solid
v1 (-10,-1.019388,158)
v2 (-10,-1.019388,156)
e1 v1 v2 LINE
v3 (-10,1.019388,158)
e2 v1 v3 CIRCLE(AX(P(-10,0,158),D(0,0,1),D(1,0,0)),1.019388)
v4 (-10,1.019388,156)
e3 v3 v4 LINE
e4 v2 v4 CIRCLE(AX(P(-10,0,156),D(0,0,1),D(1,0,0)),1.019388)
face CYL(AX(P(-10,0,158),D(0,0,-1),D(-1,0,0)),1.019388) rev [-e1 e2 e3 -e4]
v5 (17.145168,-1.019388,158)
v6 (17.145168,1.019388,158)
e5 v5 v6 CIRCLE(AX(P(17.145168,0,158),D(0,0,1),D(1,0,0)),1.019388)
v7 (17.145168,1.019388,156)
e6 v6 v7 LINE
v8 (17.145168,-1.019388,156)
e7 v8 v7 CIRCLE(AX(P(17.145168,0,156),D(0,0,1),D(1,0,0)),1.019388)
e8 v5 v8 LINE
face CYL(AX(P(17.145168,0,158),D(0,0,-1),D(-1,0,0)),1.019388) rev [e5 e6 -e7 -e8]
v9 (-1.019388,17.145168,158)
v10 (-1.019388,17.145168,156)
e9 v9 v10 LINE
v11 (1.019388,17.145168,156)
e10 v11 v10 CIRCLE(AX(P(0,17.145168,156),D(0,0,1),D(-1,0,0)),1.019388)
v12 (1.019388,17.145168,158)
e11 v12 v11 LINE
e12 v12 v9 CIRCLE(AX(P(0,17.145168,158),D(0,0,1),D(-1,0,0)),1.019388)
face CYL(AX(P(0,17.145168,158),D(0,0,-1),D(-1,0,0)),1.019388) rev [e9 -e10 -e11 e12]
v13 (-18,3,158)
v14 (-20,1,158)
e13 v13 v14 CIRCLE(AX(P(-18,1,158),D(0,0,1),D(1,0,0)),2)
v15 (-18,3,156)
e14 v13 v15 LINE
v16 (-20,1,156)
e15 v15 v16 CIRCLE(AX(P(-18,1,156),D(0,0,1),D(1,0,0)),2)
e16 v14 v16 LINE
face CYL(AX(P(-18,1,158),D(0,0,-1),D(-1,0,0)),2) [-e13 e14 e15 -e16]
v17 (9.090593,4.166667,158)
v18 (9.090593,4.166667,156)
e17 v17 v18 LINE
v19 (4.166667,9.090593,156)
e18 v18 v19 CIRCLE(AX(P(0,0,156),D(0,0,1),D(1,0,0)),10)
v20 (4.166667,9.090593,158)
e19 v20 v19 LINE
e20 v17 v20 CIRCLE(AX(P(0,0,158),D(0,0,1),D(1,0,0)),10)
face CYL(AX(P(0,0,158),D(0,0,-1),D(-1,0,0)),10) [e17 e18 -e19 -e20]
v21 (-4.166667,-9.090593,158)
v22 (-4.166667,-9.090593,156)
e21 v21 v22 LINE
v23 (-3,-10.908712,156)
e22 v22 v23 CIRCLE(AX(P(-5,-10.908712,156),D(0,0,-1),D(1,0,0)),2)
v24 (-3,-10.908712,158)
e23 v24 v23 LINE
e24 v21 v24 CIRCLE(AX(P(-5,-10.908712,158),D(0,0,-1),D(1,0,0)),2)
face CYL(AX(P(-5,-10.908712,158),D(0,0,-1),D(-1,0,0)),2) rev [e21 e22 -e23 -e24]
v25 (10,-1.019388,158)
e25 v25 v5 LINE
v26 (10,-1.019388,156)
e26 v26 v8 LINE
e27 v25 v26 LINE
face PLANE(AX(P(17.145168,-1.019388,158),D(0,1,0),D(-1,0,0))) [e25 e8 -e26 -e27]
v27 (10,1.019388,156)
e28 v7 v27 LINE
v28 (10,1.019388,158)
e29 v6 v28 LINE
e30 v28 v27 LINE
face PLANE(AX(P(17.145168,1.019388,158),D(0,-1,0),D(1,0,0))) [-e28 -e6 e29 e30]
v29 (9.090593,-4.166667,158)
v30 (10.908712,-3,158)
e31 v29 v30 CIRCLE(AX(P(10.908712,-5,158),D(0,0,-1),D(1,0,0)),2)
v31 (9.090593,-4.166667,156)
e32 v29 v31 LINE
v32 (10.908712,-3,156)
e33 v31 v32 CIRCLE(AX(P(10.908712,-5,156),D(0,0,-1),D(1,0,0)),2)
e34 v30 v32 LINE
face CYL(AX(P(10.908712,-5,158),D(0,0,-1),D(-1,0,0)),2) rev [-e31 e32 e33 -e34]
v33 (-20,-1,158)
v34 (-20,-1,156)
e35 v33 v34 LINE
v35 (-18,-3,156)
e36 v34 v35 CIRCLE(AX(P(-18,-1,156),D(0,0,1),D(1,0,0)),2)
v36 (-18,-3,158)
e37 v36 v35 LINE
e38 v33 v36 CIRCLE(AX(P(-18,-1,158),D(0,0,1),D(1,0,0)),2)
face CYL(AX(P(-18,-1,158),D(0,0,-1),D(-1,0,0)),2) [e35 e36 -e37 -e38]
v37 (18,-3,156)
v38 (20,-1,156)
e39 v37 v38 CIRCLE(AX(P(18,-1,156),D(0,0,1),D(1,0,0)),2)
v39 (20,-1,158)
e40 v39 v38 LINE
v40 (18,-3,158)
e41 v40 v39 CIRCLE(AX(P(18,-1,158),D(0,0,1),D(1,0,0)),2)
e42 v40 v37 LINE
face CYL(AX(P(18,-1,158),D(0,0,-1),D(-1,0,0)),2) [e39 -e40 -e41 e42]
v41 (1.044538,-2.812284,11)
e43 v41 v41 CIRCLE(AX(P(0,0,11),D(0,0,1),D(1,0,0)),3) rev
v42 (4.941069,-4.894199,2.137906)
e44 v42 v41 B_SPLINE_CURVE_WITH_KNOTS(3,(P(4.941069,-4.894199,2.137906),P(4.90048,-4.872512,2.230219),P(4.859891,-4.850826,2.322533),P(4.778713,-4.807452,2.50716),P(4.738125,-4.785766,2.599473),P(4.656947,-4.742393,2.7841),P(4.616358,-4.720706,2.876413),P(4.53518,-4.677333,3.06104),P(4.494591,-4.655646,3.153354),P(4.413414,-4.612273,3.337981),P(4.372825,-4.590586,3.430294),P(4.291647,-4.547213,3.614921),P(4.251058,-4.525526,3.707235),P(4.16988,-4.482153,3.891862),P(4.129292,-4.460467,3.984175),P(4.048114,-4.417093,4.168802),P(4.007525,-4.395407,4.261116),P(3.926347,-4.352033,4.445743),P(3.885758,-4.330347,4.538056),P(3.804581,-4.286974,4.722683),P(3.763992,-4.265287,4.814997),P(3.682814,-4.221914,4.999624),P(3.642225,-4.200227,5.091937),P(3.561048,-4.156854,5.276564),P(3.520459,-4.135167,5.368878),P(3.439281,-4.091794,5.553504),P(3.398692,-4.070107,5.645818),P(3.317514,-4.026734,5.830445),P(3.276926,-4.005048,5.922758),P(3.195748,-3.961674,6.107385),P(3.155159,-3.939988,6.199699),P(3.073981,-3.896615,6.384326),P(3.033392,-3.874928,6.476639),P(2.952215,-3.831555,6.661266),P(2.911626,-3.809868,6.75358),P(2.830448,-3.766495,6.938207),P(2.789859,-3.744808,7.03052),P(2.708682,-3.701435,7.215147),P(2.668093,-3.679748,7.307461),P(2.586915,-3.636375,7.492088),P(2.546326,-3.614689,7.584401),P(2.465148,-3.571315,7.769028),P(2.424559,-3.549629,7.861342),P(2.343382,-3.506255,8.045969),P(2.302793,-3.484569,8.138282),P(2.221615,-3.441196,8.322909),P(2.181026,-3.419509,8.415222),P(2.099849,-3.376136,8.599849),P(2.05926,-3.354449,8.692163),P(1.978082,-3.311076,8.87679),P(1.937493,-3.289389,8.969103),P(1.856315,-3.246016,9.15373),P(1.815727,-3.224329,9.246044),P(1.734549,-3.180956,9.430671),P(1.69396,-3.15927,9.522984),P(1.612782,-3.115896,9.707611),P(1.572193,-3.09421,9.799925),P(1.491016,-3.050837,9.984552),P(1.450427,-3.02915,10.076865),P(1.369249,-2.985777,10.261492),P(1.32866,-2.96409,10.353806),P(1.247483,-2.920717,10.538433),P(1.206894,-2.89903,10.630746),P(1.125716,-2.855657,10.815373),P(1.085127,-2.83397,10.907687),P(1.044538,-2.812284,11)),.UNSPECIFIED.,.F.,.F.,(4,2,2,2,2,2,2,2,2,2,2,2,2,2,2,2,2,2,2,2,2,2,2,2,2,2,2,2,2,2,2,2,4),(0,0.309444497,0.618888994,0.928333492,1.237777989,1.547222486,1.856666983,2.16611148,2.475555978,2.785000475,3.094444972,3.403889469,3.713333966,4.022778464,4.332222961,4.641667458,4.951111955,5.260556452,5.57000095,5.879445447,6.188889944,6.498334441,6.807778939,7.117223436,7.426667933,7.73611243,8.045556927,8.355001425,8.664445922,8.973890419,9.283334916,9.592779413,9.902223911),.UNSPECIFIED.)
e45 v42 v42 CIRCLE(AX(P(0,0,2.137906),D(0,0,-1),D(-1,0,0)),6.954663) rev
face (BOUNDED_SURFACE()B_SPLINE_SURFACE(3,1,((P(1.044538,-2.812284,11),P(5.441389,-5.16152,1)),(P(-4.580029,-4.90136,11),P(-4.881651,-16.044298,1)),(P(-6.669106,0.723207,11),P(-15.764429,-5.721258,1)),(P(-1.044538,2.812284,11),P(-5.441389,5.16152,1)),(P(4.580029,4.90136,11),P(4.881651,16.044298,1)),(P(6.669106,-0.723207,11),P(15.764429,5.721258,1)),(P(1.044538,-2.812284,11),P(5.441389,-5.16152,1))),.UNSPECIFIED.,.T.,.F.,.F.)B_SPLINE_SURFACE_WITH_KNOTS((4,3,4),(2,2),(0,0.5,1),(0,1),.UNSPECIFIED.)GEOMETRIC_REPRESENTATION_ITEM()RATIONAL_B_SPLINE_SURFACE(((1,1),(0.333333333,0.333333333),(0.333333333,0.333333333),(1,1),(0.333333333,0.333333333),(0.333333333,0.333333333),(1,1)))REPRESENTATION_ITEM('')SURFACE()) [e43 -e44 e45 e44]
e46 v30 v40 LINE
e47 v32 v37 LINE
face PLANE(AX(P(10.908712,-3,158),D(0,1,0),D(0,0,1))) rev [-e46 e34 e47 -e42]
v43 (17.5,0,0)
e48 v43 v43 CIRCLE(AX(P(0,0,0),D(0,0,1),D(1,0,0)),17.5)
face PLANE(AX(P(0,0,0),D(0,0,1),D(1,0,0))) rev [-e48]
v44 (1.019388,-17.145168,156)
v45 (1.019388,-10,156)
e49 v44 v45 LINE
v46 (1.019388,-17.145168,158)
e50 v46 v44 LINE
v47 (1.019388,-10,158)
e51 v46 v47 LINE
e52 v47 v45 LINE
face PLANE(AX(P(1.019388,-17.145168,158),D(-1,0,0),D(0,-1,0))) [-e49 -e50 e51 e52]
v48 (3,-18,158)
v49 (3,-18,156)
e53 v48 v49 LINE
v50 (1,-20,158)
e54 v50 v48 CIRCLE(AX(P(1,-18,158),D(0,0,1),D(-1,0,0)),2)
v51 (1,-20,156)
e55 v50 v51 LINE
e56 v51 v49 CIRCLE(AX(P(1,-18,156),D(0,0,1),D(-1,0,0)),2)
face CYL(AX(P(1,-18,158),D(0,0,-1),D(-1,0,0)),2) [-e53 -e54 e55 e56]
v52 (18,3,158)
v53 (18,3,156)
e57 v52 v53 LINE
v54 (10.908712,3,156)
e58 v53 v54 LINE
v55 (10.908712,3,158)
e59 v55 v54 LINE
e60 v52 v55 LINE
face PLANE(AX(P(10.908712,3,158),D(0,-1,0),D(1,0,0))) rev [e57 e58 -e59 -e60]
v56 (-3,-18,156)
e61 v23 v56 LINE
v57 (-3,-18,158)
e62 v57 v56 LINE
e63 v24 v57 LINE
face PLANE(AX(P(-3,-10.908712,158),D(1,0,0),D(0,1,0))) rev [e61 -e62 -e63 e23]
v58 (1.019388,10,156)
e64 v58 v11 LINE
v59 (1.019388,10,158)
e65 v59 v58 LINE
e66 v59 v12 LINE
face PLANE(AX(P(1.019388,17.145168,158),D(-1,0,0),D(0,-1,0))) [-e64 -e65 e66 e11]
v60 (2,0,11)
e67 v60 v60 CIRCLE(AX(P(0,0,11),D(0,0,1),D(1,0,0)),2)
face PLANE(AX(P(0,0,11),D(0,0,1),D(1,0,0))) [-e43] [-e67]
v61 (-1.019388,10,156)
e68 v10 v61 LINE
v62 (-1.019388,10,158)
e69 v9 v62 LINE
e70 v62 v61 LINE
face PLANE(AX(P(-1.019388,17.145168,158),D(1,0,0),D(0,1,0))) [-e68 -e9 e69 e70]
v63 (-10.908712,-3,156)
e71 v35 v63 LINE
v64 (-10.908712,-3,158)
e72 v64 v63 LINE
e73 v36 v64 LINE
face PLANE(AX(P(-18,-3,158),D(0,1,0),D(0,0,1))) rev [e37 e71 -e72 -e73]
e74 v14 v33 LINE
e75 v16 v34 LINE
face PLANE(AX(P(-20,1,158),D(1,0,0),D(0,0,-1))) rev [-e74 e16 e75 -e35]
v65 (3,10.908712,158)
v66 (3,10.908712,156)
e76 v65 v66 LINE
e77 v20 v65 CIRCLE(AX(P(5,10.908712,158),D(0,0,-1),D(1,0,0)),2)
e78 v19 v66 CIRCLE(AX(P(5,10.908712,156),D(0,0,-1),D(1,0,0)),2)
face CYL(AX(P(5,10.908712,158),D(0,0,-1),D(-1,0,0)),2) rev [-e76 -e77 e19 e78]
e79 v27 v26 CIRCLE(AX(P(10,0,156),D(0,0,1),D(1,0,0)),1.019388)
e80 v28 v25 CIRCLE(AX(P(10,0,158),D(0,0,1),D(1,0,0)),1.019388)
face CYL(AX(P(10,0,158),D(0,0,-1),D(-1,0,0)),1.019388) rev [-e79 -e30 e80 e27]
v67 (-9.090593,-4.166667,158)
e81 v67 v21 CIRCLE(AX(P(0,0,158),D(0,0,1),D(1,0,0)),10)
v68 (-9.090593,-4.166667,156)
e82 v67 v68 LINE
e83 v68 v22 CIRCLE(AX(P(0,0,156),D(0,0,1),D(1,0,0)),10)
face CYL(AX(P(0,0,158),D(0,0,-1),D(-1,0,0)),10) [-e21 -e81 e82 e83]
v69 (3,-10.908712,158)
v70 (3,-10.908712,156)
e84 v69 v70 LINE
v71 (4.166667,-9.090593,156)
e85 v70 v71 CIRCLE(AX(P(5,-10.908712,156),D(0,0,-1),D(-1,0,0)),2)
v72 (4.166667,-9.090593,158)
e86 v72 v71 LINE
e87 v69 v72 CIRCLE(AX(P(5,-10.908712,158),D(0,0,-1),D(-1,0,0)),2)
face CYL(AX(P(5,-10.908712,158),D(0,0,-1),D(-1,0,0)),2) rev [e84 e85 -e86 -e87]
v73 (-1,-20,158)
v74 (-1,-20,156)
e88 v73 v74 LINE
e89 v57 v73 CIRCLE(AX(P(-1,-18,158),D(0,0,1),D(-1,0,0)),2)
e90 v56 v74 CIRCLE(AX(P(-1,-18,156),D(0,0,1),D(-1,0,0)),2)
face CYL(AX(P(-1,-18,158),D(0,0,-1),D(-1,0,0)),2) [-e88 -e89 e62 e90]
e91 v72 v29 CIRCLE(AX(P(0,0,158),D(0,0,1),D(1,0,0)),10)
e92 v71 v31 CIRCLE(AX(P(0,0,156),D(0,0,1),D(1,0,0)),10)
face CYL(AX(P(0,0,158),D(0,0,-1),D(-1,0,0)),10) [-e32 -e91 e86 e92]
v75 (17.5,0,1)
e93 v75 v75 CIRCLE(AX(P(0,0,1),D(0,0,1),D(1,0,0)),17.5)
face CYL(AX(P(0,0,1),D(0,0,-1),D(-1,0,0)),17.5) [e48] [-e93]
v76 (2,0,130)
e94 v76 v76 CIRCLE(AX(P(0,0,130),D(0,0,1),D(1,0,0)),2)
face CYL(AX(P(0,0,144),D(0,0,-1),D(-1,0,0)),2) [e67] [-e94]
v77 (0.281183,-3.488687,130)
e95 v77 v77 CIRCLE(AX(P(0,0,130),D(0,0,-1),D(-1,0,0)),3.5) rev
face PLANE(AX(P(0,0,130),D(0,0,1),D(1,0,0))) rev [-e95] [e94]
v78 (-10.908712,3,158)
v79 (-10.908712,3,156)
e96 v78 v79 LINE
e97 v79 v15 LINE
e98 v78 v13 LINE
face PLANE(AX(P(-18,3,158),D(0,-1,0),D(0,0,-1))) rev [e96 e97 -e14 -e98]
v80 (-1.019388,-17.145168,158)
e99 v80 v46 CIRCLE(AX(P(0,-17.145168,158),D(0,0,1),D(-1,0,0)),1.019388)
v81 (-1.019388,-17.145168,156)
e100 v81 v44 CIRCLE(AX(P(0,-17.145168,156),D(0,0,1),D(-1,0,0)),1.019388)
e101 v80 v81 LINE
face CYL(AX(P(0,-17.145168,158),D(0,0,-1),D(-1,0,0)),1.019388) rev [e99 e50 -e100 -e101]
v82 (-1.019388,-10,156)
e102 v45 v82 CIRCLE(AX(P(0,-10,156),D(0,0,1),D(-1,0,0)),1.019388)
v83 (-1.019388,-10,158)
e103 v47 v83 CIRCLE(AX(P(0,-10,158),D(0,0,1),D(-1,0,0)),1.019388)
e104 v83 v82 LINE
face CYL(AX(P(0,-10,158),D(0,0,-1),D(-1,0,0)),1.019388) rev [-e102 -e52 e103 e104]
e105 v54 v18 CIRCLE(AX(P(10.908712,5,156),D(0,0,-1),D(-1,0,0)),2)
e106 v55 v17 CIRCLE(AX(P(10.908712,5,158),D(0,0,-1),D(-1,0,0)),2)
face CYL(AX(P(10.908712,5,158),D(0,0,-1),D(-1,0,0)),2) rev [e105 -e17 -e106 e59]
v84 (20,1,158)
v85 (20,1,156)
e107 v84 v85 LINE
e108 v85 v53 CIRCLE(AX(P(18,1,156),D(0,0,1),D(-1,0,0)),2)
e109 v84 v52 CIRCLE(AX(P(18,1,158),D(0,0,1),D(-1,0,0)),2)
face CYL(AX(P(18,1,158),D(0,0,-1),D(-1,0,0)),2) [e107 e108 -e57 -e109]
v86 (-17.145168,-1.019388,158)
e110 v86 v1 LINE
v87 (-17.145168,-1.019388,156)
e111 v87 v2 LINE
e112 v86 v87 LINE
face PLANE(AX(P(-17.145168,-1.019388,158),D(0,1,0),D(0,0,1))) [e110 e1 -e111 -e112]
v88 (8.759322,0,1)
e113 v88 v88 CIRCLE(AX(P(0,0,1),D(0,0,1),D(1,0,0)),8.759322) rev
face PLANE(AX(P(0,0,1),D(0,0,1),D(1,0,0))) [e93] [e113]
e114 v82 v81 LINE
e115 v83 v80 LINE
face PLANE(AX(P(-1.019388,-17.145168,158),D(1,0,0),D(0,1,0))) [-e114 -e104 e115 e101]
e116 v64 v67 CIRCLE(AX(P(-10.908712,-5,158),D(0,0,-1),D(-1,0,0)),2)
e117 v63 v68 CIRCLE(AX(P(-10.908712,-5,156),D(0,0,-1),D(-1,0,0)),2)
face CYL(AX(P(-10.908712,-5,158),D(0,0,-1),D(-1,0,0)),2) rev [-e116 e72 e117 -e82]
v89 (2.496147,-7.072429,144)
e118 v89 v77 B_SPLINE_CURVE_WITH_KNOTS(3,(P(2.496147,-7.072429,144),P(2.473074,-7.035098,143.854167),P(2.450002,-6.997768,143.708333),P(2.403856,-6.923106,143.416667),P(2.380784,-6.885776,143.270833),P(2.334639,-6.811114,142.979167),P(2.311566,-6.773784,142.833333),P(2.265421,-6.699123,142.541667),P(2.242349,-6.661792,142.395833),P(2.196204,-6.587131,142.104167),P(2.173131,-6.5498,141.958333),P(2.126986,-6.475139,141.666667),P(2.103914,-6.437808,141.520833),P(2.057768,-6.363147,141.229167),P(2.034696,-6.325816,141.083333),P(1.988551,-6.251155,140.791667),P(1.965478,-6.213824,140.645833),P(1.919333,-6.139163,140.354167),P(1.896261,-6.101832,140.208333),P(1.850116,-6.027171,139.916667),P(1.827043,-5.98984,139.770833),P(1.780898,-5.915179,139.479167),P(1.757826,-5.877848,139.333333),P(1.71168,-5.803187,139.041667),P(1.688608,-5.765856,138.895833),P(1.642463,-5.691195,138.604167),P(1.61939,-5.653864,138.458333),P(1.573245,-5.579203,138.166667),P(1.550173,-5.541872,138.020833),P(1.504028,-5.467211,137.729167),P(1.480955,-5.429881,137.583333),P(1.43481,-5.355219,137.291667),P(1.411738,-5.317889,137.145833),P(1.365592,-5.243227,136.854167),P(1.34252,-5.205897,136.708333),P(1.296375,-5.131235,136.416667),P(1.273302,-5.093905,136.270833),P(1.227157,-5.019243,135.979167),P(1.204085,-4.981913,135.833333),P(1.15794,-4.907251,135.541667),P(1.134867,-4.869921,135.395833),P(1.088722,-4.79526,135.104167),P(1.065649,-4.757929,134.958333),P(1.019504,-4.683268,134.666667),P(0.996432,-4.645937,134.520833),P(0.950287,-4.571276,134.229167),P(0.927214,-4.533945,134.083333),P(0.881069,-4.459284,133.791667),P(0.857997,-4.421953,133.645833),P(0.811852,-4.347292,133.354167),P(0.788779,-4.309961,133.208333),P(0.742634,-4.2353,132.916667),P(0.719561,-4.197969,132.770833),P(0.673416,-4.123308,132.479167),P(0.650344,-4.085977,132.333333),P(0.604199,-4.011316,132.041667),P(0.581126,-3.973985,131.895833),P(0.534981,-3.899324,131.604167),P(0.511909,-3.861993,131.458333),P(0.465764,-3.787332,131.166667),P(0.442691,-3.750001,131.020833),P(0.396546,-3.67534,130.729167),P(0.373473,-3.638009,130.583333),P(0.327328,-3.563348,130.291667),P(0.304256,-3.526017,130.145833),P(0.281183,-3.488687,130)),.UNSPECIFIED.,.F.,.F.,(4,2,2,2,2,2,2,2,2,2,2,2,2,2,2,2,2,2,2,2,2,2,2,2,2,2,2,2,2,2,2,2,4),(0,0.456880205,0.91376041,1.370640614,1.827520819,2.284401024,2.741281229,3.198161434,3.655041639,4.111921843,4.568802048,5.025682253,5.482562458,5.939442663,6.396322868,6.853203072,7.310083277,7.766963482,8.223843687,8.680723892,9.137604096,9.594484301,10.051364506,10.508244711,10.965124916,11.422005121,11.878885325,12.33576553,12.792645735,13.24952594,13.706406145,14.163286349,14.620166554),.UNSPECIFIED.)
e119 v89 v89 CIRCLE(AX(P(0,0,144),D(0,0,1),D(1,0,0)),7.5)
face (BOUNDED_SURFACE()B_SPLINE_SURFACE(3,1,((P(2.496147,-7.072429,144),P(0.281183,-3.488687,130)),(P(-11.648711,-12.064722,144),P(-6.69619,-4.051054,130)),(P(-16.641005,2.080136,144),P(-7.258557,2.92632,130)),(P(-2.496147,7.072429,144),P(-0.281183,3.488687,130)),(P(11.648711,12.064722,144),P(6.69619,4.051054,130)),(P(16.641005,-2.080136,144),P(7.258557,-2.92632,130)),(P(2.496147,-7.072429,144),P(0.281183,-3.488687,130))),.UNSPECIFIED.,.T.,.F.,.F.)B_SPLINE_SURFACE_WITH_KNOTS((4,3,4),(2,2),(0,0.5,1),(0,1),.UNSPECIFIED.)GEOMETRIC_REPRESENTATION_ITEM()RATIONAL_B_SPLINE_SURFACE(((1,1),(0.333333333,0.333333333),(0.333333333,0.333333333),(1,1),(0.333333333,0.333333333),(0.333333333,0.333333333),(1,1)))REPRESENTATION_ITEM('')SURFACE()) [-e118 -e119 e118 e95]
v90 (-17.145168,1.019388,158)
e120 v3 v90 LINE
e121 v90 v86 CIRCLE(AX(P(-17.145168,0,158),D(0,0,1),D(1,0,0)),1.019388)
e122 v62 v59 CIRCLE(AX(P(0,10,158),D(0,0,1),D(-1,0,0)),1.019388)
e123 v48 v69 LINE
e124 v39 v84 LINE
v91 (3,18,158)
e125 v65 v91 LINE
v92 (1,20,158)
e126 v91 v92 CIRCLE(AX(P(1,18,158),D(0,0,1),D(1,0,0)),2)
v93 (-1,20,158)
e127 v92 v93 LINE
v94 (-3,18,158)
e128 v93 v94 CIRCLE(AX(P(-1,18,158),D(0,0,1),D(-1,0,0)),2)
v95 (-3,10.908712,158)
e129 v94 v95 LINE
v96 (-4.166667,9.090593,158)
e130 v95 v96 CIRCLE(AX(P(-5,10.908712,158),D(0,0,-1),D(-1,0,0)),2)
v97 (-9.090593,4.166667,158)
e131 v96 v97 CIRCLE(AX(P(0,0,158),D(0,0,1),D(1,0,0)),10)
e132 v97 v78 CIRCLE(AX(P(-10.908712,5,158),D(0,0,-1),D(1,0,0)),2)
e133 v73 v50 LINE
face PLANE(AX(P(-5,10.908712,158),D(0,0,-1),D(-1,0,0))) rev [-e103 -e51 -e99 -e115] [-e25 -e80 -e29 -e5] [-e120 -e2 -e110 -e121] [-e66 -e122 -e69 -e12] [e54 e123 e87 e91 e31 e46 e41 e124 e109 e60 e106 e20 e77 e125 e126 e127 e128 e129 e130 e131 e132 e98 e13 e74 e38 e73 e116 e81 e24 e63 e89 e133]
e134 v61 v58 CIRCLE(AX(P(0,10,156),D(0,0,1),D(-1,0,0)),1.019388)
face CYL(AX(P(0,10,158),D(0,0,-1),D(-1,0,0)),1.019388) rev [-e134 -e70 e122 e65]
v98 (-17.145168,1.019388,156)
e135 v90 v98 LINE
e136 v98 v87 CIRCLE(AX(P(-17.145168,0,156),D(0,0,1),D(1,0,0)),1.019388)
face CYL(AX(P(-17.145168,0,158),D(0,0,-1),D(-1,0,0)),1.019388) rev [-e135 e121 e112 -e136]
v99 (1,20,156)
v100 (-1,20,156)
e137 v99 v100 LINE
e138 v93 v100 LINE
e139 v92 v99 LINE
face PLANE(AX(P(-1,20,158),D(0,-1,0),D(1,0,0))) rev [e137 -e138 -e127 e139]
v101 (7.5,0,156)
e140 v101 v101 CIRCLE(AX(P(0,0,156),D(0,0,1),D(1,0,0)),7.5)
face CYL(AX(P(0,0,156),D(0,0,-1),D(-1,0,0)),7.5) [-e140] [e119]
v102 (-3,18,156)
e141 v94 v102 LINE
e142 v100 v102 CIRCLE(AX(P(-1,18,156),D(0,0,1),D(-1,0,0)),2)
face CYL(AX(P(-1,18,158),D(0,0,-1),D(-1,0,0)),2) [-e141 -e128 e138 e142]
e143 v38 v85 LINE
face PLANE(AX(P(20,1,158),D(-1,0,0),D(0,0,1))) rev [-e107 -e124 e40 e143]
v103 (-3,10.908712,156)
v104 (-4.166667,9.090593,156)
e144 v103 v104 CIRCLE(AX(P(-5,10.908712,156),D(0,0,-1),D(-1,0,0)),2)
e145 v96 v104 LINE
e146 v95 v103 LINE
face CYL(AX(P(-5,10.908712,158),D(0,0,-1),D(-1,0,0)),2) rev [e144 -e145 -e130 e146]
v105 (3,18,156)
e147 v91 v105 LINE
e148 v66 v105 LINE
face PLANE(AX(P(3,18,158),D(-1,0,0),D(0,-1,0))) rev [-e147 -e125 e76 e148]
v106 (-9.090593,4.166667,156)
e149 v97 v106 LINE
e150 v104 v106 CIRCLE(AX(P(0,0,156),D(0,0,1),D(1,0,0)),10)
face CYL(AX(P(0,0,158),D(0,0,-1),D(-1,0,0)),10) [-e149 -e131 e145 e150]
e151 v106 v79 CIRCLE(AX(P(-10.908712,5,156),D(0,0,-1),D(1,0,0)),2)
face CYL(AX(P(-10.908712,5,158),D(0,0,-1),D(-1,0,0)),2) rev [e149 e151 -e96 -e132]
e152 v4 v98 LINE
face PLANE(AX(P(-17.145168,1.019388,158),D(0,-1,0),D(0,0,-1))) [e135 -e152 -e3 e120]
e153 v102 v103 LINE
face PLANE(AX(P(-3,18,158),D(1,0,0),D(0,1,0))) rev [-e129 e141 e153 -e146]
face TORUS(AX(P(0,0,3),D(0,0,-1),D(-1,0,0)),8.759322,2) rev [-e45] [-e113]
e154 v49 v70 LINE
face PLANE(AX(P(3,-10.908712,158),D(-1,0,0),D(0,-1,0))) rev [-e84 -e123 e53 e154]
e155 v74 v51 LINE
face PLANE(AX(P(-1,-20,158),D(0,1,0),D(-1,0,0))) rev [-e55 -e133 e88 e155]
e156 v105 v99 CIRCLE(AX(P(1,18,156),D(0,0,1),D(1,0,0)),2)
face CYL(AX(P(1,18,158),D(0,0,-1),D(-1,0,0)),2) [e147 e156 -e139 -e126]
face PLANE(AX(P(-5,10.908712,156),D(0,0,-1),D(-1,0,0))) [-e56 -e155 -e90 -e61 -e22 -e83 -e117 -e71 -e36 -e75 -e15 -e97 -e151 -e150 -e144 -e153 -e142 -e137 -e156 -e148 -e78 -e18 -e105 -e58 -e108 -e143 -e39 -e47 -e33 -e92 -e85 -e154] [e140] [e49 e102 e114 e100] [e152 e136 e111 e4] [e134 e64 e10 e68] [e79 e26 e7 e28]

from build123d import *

# Parameters (mm, degrees)
SKETCH1_R           = 17.5
BOSS_EXTRUDE1_DEPTH = 1
SKETCH3_R           = 3
BOSS_EXTRUDE2_DEPTH = 10
FILLET1_R           = 2
SKETCH4_R           = 2
CUT_EXTRUDE1_DEPTH  = 7
BOSS_EXTRUDE3_START = 140
SKETCH5_R           = 2
BOSS_EXTRUDE3_DEPTH = 140
SKETCH6_R           = 3.5
BOSS_EXTRUDE4_DEPTH = 14
SKETCH8_R           = 7.5
BOSS_EXTRUDE5_DEPTH = 12
BOSS_EXTRUDE6_DEPTH = 2


with BuildPart() as part:
    # Sketch1 → Boss-Extrude1 (new body)
    with BuildSketch(Plane.XY):
        Circle(SKETCH1_R)
    extrude(amount=BOSS_EXTRUDE1_DEPTH)

    # Sketch3 → Boss-Extrude2 (add)
    with BuildSketch(Plane.XY.offset(1)):
        Circle(SKETCH3_R)
    extrude(amount=BOSS_EXTRUDE2_DEPTH)

    # Loft1: read off the stored shape, not the designer's step
    # Loft1: loft between two sections, ruled curve by curve
    loft1_from = [
        Edge.make_bspline([(1.044538227, -2.81228375, 11), (-4.580029274, -4.901360204, 11), (-6.669105728, 0.723207296, 11), (-1.044538227, 2.81228375, 11), (4.580029274, 4.901360204, 11), (6.669105728, -0.723207296, 11), (1.044538227, -2.81228375, 11)], [0, 0, 0, 0, 0.5, 0.5, 0.5, 1, 1, 1, 1], 3, [1, 0.333333333, 0.333333333, 1, 0.333333333, 0.333333333, 1]),
    ]
    loft1_to = [
        Edge.make_bspline([(5.441388928, -5.161519789, 1), (-4.88165065, -16.044297645, 1), (-15.764428506, -5.721258067, 1), (-5.441388928, 5.161519789, 1), (4.88165065, 16.044297645, 1), (15.764428506, 5.721258067, 1), (5.441388928, -5.161519789, 1)], [0, 0, 0, 0, 0.5, 0.5, 0.5, 1, 1, 1, 1], 3, [1, 0.333333333, 0.333333333, 1, 0.333333333, 0.333333333, 1]),
    ]
    loft1 = Solid(Shell([*[Face.make_surface_from_curves(loft1_from[k], loft1_to[k]) for k in range(1)], Face(Wire(loft1_from)), Face(Wire(loft1_to))]))
    add(loft1)

    # Fillet1
    fillet1_edges = [part.edges().sort_by_distance(p)[0] for p in [
        (-5.441388928, 5.161519789, 1),
    ]]
    fillet(fillet1_edges, radius=FILLET1_R)

    # Sketch4 → Cut-Extrude1 (cut)
    with BuildSketch(Plane.XY.offset(11)):
        Circle(SKETCH4_R)
    extrude(amount=-CUT_EXTRUDE1_DEPTH, mode=Mode.SUBTRACT)

    # Sketch5 → Boss-Extrude3 (add)
    with BuildSketch(Plane.XY.offset(4).offset(BOSS_EXTRUDE3_START)):
        Circle(SKETCH5_R)
    extrude(amount=-BOSS_EXTRUDE3_DEPTH)

    # Sketch6 → Boss-Extrude4 (add)
    with BuildSketch(Plane.XY.offset(144)):
        Circle(SKETCH6_R)
    extrude(amount=-BOSS_EXTRUDE4_DEPTH)

    # Loft2: read off the stored shape, not the designer's step
    # Loft2: loft between two sections, ruled curve by curve
    loft2_from = [
        Edge.make_bspline([(2.496146584, -7.072429019, 144), (-11.648711454, -12.064722187, 144), (-16.641004622, 2.080135851, 144), (-2.496146584, 7.072429019, 144), (11.648711454, 12.064722187, 144), (16.641004622, -2.080135851, 144), (2.496146584, -7.072429019, 144)], [0, 0, 0, 0, 0.5, 0.5, 0.5, 1, 1, 1, 1], 3, [1, 0.333333333, 0.333333333, 1, 0.333333333, 0.333333333, 1]),
    ]
    loft2_to = [
        Edge.make_bspline([(0.28118335, -3.488686848, 130), (-6.696190346, -4.051053549, 130), (-7.258557046, 2.926320147, 130), (-0.28118335, 3.488686848, 130), (6.696190346, 4.051053549, 130), (7.258557046, -2.926320147, 130), (0.28118335, -3.488686848, 130)], [0, 0, 0, 0, 0.5, 0.5, 0.5, 1, 1, 1, 1], 3, [1, 0.333333333, 0.333333333, 1, 0.333333333, 0.333333333, 1]),
    ]
    loft2 = Solid(Shell([*[Face.make_surface_from_curves(loft2_from[k], loft2_to[k]) for k in range(1)], Face(Wire(loft2_from)), Face(Wire(loft2_to))]))
    add(loft2)

    # Sketch8 → Boss-Extrude5 (add)
    with BuildSketch(Plane.XY.offset(144)):
        with Locations(Location((0, 0, 0), (0, 0, 289.44))):
            Circle(SKETCH8_R)
    extrude(amount=BOSS_EXTRUDE5_DEPTH)

    # Sketch9 → Boss-Extrude6 (add)
    with BuildSketch(Plane.XY.offset(156)):
        with BuildLine():
            Line((-18, 3), (-10.908712115, 3))
            ThreePointArc((-10.908712115, 3), (-9.828588665, 3.316749177), (-9.090593429, 4.166666667))
            ThreePointArc((-9.090593429, 4.166666667), (-7.071067812, 7.071067812), (-4.166666667, 9.090593429))
            ThreePointArc((-4.166666667, 9.090593429), (-3.316749177, 9.828588665), (-3, 10.908712115))
            Line((-3, 10.908712115), (-3, 18))
            ThreePointArc((-3, 18), (-2.414213562, 19.414213562), (-1, 20))
            Line((-1, 20), (1, 20))
            ThreePointArc((1, 20), (2.414213562, 19.414213562), (3, 18))
            Line((3, 18), (3, 10.908712115))
            ThreePointArc((3, 10.908712115), (3.316749177, 9.828588665), (4.166666667, 9.090593429))
            ThreePointArc((4.166666667, 9.090593429), (7.071067812, 7.071067812), (9.090593429, 4.166666667))
            ThreePointArc((9.090593429, 4.166666667), (9.828588665, 3.316749177), (10.908712115, 3))
            Line((10.908712115, 3), (18, 3))
            ThreePointArc((18, 3), (19.414213562, 2.414213562), (20, 1))
            Line((20, 1), (20, -1))
            ThreePointArc((20, -1), (19.414213562, -2.414213562), (18, -3))
            Line((18, -3), (10.908712115, -3))
            ThreePointArc((10.908712115, -3), (9.828588665, -3.316749177), (9.090593429, -4.166666667))
            ThreePointArc((9.090593429, -4.166666667), (7.071067812, -7.071067812), (4.166666667, -9.090593429))
            ThreePointArc((4.166666667, -9.090593429), (3.316749177, -9.828588665), (3, -10.908712115))
            Line((3, -10.908712115), (3, -18))
            ThreePointArc((3, -18), (2.414213562, -19.414213562), (1, -20))
            Line((1, -20), (-1, -20))
            ThreePointArc((-1, -20), (-2.414213562, -19.414213562), (-3, -18))
            Line((-3, -18), (-3, -10.908712115))
            ThreePointArc((-3, -10.908712115), (-3.316749177, -9.828588665), (-4.166666667, -9.090593429))
            ThreePointArc((-4.166666667, -9.090593429), (-7.071067812, -7.071067812), (-9.090593429, -4.166666667))
            ThreePointArc((-9.090593429, -4.166666667), (-9.828588665, -3.316749177), (-10.908712115, -3))
            Line((-10.908712115, -3), (-18, -3))
            ThreePointArc((-18, -3), (-19.414213562, -2.414213562), (-20, -1))
            Line((-20, -1), (-20, 1))
            ThreePointArc((-20, 1), (-19.414213562, 2.414213562), (-18, 3))
        make_face()
        with BuildLine():
            Line((-17.145168387, 1.019387686), (-10, 1.019387686))
            ThreePointArc((-10, 1.019387686), (-8.980612314, 0), (-10, -1.019387686))
            Line((-10, -1.019387686), (-17.145168387, -1.019387686))
            ThreePointArc((-17.145168387, -1.019387686), (-18.164556073, 0), (-17.145168387, 1.019387686))
        make_face(mode=Mode.SUBTRACT)
        with BuildLine():
            Line((-1.019387686, 17.145168387), (-1.019387686, 10))
            ThreePointArc((-1.019387686, 10), (0, 8.980612314), (1.019387686, 10))
            Line((1.019387686, 10), (1.019387686, 17.145168387))
            ThreePointArc((1.019387686, 17.145168387), (0, 18.164556073), (-1.019387686, 17.145168387))
        make_face(mode=Mode.SUBTRACT)
        with BuildLine():
            Line((1.019387686, -17.145168387), (1.019387686, -10))
            ThreePointArc((1.019387686, -10), (0, -8.980612314), (-1.019387686, -10))
            Line((-1.019387686, -10), (-1.019387686, -17.145168387))
            ThreePointArc((-1.019387686, -17.145168387), (0, -18.164556073), (1.019387686, -17.145168387))
        make_face(mode=Mode.SUBTRACT)
        with BuildLine():
            Line((17.145168387, -1.019387686), (10, -1.019387686))
            ThreePointArc((10, -1.019387686), (8.980612314, 0), (10, 1.019387686))
            Line((10, 1.019387686), (17.145168387, 1.019387686))
            ThreePointArc((17.145168387, 1.019387686), (18.164556073, 0), (17.145168387, -1.019387686))
        make_face(mode=Mode.SUBTRACT)
    extrude(amount=BOSS_EXTRUDE6_DEPTH)


solid = part.part
